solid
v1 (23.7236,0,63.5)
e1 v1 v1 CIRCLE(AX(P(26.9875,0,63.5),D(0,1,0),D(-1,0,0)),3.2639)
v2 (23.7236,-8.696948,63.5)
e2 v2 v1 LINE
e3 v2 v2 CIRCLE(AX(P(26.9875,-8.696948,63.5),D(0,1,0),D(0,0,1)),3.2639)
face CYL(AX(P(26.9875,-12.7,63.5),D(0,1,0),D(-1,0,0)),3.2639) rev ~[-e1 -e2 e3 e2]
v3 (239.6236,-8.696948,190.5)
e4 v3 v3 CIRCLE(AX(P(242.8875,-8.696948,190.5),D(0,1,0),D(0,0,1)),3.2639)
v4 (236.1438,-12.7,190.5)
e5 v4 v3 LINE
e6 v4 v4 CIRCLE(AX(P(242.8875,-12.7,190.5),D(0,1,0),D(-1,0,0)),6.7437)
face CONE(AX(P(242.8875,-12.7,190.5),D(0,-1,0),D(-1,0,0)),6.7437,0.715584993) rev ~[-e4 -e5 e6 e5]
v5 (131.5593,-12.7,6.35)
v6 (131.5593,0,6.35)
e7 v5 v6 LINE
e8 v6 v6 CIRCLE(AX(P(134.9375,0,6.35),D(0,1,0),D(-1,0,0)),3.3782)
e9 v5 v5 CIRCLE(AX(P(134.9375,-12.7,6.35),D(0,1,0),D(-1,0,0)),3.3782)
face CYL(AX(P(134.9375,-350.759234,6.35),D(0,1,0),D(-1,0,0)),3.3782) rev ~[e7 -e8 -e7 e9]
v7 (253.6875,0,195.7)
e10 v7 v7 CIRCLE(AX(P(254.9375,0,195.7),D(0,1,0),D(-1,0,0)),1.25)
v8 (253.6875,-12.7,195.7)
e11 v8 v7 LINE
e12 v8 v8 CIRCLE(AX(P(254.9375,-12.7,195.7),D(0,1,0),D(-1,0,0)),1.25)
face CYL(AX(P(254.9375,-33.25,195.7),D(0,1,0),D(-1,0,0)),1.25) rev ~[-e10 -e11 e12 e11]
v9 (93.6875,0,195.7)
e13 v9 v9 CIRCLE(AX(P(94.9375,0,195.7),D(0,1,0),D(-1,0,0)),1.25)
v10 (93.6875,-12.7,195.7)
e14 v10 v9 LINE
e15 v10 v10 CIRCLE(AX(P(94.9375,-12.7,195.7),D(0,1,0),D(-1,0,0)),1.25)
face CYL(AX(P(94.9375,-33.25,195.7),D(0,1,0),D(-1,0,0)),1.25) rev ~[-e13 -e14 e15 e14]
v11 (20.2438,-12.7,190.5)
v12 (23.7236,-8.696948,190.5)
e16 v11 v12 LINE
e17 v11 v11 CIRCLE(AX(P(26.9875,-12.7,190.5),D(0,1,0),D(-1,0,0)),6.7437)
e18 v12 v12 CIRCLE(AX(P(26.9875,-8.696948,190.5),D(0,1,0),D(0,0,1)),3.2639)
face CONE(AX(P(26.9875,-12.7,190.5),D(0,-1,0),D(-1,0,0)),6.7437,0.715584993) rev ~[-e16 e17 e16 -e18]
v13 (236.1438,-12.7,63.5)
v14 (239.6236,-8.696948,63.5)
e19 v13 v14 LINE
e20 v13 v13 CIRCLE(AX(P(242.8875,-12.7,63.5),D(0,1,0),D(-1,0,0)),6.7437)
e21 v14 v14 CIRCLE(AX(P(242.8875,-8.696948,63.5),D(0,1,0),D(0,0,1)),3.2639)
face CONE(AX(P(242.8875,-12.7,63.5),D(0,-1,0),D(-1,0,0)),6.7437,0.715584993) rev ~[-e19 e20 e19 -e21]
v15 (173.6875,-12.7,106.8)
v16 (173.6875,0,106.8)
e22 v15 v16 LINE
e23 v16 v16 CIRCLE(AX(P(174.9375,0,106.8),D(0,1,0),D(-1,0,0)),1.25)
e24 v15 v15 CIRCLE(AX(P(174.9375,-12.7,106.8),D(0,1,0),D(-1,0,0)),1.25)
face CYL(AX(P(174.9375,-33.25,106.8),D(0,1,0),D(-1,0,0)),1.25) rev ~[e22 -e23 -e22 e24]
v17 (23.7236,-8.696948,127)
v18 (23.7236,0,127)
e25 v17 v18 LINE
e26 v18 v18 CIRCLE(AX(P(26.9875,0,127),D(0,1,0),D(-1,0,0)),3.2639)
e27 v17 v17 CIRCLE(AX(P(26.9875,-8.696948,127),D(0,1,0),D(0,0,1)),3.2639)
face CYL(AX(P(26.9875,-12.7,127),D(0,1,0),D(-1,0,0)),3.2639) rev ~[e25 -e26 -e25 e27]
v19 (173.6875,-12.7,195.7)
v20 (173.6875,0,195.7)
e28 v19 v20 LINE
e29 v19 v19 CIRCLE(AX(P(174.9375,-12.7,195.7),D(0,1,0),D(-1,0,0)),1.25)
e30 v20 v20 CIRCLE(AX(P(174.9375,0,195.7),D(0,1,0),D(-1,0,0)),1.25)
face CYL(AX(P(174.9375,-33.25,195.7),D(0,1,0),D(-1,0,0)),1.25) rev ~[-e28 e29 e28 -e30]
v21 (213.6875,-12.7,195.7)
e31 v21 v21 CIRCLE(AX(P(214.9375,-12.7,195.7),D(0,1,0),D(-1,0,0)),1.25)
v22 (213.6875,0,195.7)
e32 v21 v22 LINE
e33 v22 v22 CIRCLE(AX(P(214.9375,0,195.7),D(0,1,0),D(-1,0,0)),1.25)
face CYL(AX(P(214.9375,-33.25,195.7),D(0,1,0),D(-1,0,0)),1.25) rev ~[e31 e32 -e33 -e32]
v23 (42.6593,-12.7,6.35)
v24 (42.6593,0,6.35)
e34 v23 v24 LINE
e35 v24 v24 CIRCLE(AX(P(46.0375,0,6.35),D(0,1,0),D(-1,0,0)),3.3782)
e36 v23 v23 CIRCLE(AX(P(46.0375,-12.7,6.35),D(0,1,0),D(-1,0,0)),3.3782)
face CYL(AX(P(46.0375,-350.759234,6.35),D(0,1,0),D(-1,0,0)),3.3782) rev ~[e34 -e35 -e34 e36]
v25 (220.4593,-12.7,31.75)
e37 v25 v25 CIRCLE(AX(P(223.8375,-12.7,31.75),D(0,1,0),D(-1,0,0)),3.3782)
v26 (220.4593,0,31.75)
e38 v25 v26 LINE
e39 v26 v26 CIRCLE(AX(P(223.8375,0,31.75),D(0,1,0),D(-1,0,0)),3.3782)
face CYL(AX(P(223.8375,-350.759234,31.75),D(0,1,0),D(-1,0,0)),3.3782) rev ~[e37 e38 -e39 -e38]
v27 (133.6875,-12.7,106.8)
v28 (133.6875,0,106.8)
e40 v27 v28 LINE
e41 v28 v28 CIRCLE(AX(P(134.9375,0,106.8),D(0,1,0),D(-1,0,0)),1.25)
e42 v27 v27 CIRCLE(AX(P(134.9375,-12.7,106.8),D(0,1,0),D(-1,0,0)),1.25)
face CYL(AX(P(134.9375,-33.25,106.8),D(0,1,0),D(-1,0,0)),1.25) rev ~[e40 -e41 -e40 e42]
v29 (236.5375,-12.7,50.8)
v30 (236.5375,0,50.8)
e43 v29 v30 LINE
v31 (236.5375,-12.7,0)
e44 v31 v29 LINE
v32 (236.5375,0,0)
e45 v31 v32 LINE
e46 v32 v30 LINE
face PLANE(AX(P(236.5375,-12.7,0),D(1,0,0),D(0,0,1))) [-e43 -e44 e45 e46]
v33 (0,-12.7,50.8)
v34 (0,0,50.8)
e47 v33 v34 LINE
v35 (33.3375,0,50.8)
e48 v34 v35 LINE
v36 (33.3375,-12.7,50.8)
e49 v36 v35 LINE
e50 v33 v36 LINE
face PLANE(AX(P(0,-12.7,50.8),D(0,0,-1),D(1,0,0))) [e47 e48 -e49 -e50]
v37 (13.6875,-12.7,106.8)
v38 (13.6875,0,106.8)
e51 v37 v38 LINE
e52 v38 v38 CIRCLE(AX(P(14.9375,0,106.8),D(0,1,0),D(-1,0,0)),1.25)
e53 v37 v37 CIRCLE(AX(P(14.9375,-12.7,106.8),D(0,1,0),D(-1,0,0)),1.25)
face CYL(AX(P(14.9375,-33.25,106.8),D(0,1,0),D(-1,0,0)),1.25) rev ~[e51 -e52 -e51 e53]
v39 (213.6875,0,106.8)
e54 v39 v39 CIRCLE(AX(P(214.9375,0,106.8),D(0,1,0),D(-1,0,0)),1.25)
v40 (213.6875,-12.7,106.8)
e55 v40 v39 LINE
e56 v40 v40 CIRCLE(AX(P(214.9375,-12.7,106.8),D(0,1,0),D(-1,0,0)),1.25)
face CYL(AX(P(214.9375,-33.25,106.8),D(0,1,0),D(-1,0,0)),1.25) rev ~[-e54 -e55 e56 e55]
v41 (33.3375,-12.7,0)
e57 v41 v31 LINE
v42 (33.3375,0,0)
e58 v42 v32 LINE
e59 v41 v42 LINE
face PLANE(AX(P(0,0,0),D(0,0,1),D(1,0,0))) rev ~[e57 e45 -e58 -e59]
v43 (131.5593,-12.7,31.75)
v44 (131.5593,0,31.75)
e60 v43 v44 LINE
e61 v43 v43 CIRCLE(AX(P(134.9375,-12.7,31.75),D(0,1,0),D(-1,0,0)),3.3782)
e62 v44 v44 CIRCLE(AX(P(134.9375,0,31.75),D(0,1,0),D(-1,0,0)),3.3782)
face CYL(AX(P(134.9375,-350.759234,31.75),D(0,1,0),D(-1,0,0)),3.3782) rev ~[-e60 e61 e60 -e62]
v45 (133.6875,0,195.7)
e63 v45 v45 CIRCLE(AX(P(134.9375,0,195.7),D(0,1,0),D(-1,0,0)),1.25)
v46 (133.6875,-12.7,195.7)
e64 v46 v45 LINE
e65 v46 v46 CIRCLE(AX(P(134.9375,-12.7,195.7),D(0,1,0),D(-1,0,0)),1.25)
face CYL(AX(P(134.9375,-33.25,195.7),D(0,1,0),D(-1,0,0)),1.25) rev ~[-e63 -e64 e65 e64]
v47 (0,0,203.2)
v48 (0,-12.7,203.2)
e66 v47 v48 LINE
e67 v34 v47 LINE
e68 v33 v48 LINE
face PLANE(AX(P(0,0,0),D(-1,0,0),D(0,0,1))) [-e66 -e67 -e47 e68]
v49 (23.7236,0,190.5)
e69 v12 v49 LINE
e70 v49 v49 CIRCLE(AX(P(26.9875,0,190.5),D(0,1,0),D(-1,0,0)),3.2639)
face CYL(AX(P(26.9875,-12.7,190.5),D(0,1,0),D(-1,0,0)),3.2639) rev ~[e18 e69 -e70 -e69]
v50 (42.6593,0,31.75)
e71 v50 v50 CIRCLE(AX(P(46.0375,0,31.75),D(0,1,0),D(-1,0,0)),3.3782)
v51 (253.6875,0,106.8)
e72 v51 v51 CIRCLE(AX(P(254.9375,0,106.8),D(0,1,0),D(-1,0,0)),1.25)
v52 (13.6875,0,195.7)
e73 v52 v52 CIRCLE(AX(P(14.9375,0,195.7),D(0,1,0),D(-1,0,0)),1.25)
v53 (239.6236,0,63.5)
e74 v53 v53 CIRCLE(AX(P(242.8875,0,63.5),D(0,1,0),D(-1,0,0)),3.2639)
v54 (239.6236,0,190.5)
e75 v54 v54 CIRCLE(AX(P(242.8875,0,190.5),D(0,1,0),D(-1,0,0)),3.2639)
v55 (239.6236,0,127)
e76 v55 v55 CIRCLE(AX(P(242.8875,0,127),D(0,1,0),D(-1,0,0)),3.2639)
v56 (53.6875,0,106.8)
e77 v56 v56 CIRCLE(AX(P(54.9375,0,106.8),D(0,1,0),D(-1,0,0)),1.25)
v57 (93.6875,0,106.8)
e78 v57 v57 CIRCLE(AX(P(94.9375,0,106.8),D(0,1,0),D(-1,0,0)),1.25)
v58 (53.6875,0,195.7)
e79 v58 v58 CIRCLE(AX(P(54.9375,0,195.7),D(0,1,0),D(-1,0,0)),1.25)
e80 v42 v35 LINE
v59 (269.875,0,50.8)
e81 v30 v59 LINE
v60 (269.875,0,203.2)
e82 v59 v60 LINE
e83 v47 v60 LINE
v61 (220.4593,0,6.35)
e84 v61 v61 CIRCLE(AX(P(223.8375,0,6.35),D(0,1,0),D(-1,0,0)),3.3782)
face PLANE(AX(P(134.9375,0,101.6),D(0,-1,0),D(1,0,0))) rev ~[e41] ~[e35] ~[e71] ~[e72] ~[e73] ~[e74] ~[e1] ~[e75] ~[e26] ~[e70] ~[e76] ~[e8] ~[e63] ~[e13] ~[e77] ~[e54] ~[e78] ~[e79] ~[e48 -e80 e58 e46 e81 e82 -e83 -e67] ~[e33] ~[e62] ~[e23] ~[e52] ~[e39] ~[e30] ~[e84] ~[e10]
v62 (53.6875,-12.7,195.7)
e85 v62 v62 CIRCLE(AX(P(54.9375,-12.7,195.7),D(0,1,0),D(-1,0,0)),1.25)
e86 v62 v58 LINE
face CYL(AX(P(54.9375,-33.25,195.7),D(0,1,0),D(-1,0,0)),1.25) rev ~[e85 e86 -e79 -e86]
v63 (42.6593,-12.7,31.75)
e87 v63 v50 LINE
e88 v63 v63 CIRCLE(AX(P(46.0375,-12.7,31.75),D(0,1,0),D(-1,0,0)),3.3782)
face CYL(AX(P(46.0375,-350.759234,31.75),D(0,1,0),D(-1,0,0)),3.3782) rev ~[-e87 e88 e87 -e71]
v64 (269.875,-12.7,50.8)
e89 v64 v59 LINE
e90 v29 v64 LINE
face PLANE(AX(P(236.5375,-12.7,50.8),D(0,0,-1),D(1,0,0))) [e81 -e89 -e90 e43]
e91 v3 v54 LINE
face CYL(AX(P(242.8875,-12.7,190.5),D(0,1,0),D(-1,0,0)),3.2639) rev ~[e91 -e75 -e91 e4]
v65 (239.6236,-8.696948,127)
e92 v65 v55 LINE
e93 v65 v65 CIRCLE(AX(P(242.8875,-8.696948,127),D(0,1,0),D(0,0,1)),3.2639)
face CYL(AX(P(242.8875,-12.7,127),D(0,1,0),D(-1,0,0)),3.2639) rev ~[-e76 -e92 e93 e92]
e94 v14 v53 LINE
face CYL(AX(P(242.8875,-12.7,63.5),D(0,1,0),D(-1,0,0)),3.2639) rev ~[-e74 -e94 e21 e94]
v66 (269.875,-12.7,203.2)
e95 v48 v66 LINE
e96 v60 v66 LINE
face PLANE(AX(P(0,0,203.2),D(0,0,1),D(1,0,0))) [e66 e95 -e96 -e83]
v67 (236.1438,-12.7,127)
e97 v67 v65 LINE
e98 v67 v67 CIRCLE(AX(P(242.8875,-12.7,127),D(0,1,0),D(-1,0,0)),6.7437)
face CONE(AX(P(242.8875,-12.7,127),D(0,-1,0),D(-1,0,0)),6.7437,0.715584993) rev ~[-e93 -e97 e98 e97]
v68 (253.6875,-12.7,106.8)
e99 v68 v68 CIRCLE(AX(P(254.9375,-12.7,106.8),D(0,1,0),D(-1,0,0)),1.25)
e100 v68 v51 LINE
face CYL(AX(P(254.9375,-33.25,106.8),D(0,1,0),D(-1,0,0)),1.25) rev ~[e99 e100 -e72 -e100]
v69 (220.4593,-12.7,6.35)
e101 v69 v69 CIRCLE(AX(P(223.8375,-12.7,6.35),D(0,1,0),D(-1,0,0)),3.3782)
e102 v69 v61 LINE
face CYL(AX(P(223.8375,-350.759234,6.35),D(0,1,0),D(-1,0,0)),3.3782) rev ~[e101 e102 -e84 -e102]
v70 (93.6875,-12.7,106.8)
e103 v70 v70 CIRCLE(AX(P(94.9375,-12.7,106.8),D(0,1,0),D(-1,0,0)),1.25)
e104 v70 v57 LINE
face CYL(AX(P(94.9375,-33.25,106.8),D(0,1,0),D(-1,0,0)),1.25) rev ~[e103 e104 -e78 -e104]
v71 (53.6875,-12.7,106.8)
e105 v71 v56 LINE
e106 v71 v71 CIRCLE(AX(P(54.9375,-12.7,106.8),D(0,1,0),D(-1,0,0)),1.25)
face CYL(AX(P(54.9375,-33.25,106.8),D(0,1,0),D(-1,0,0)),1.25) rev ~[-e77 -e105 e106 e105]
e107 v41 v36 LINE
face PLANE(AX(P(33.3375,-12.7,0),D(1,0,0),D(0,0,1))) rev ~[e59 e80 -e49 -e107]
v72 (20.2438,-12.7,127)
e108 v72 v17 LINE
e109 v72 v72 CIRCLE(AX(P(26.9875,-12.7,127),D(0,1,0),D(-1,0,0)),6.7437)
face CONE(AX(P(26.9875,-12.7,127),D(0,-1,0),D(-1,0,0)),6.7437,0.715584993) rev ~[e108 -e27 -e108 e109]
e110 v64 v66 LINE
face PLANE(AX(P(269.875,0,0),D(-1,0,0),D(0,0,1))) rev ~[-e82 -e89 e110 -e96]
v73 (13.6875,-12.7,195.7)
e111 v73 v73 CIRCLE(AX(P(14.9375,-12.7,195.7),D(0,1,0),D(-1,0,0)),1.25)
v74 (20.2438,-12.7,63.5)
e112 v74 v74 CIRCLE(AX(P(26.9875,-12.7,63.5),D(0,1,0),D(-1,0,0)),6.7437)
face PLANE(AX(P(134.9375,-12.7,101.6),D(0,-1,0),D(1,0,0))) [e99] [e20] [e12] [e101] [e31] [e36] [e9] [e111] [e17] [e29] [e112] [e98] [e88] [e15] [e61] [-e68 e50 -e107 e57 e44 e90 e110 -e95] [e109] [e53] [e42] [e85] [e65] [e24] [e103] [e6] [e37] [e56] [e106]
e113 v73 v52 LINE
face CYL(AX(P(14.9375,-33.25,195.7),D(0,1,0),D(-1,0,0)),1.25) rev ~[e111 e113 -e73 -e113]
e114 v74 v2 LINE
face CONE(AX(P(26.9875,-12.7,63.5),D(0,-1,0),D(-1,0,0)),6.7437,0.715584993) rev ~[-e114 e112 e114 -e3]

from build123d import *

# Parameters (mm, degrees)
F0_W           = 269.875
F0_H           = 203.2
F1_DEPTH       = 12.7
F2_W           = 33.3375
F2_H           = 50.8
F3_DEPTH       = 12.7
F5_D           = 6.7564
F7_D           = 2.5
F7_DEPTH       = 20.55
F7_TIP         = 0.7510757738
F9_D           = 6.5278
F9_CSINK_D     = 13.4874
F9_CSINK_ANGLE = 82


# Not quite as in the source:
# - a feature names something its author has since deleted; it is built from what else it names


with BuildPart() as f1:
    # F0 (on Front) → F1 (new body)
    with BuildSketch(Plane.XZ):
        with Locations((134.9375, 101.6)):
            Rectangle(F0_W, F0_H)
    extrude(amount=F1_DEPTH)

    # F2 (on face) → F3 (cut, through all)
    with BuildSketch(Plane.XZ.offset(12.7)):
        with Locations((16.66875, 25.4)):
            Rectangle(F2_W, F2_H)
        with Locations((253.20625, 25.4)):
            Rectangle(F2_W, F2_H)
    extrude(amount=-F3_DEPTH, mode=Mode.SUBTRACT)

    # F5 (through all)
    with Locations(Plane.XZ.offset(12.7)):
        with Locations((223.8375, 31.75), (223.8375, 6.35), (134.9375, 6.35), (134.9375, 31.75), (46.0375, 31.75), (46.0375, 6.35)):
            Hole(F5_D / 2)

    # F7
    with Locations(Plane.XZ.offset(12.7)):
        with Locations((54.9375, 195.7), (94.9375, 195.7), (134.9375, 195.7), (174.9375, 195.7), (214.9375, 195.7), (214.9375, 106.8), (174.9375, 106.8), (134.9375, 106.8), (94.9375, 106.8), (54.9375, 106.8), (14.9375, 195.7), (14.9375, 106.8), (254.9375, 195.7), (254.9375, 106.8)):
            Hole(F7_D / 2, depth=F7_DEPTH)
            with Locations((0, 0, -(F7_DEPTH + F7_TIP / 2))):  # 118° drill point
                Cone(0, F7_D / 2, F7_TIP, mode=Mode.SUBTRACT)

    # F9 (through all)
    with Locations(Plane.XZ.offset(12.7)):
        with Locations((26.9875, 190.5), (26.9875, 127), (26.9875, 63.5), (242.8875, 63.5), (242.8875, 127), (242.8875, 190.5)):
            CounterSinkHole(F9_D / 2, F9_CSINK_D / 2, counter_sink_angle=F9_CSINK_ANGLE)


solid = f1.part
